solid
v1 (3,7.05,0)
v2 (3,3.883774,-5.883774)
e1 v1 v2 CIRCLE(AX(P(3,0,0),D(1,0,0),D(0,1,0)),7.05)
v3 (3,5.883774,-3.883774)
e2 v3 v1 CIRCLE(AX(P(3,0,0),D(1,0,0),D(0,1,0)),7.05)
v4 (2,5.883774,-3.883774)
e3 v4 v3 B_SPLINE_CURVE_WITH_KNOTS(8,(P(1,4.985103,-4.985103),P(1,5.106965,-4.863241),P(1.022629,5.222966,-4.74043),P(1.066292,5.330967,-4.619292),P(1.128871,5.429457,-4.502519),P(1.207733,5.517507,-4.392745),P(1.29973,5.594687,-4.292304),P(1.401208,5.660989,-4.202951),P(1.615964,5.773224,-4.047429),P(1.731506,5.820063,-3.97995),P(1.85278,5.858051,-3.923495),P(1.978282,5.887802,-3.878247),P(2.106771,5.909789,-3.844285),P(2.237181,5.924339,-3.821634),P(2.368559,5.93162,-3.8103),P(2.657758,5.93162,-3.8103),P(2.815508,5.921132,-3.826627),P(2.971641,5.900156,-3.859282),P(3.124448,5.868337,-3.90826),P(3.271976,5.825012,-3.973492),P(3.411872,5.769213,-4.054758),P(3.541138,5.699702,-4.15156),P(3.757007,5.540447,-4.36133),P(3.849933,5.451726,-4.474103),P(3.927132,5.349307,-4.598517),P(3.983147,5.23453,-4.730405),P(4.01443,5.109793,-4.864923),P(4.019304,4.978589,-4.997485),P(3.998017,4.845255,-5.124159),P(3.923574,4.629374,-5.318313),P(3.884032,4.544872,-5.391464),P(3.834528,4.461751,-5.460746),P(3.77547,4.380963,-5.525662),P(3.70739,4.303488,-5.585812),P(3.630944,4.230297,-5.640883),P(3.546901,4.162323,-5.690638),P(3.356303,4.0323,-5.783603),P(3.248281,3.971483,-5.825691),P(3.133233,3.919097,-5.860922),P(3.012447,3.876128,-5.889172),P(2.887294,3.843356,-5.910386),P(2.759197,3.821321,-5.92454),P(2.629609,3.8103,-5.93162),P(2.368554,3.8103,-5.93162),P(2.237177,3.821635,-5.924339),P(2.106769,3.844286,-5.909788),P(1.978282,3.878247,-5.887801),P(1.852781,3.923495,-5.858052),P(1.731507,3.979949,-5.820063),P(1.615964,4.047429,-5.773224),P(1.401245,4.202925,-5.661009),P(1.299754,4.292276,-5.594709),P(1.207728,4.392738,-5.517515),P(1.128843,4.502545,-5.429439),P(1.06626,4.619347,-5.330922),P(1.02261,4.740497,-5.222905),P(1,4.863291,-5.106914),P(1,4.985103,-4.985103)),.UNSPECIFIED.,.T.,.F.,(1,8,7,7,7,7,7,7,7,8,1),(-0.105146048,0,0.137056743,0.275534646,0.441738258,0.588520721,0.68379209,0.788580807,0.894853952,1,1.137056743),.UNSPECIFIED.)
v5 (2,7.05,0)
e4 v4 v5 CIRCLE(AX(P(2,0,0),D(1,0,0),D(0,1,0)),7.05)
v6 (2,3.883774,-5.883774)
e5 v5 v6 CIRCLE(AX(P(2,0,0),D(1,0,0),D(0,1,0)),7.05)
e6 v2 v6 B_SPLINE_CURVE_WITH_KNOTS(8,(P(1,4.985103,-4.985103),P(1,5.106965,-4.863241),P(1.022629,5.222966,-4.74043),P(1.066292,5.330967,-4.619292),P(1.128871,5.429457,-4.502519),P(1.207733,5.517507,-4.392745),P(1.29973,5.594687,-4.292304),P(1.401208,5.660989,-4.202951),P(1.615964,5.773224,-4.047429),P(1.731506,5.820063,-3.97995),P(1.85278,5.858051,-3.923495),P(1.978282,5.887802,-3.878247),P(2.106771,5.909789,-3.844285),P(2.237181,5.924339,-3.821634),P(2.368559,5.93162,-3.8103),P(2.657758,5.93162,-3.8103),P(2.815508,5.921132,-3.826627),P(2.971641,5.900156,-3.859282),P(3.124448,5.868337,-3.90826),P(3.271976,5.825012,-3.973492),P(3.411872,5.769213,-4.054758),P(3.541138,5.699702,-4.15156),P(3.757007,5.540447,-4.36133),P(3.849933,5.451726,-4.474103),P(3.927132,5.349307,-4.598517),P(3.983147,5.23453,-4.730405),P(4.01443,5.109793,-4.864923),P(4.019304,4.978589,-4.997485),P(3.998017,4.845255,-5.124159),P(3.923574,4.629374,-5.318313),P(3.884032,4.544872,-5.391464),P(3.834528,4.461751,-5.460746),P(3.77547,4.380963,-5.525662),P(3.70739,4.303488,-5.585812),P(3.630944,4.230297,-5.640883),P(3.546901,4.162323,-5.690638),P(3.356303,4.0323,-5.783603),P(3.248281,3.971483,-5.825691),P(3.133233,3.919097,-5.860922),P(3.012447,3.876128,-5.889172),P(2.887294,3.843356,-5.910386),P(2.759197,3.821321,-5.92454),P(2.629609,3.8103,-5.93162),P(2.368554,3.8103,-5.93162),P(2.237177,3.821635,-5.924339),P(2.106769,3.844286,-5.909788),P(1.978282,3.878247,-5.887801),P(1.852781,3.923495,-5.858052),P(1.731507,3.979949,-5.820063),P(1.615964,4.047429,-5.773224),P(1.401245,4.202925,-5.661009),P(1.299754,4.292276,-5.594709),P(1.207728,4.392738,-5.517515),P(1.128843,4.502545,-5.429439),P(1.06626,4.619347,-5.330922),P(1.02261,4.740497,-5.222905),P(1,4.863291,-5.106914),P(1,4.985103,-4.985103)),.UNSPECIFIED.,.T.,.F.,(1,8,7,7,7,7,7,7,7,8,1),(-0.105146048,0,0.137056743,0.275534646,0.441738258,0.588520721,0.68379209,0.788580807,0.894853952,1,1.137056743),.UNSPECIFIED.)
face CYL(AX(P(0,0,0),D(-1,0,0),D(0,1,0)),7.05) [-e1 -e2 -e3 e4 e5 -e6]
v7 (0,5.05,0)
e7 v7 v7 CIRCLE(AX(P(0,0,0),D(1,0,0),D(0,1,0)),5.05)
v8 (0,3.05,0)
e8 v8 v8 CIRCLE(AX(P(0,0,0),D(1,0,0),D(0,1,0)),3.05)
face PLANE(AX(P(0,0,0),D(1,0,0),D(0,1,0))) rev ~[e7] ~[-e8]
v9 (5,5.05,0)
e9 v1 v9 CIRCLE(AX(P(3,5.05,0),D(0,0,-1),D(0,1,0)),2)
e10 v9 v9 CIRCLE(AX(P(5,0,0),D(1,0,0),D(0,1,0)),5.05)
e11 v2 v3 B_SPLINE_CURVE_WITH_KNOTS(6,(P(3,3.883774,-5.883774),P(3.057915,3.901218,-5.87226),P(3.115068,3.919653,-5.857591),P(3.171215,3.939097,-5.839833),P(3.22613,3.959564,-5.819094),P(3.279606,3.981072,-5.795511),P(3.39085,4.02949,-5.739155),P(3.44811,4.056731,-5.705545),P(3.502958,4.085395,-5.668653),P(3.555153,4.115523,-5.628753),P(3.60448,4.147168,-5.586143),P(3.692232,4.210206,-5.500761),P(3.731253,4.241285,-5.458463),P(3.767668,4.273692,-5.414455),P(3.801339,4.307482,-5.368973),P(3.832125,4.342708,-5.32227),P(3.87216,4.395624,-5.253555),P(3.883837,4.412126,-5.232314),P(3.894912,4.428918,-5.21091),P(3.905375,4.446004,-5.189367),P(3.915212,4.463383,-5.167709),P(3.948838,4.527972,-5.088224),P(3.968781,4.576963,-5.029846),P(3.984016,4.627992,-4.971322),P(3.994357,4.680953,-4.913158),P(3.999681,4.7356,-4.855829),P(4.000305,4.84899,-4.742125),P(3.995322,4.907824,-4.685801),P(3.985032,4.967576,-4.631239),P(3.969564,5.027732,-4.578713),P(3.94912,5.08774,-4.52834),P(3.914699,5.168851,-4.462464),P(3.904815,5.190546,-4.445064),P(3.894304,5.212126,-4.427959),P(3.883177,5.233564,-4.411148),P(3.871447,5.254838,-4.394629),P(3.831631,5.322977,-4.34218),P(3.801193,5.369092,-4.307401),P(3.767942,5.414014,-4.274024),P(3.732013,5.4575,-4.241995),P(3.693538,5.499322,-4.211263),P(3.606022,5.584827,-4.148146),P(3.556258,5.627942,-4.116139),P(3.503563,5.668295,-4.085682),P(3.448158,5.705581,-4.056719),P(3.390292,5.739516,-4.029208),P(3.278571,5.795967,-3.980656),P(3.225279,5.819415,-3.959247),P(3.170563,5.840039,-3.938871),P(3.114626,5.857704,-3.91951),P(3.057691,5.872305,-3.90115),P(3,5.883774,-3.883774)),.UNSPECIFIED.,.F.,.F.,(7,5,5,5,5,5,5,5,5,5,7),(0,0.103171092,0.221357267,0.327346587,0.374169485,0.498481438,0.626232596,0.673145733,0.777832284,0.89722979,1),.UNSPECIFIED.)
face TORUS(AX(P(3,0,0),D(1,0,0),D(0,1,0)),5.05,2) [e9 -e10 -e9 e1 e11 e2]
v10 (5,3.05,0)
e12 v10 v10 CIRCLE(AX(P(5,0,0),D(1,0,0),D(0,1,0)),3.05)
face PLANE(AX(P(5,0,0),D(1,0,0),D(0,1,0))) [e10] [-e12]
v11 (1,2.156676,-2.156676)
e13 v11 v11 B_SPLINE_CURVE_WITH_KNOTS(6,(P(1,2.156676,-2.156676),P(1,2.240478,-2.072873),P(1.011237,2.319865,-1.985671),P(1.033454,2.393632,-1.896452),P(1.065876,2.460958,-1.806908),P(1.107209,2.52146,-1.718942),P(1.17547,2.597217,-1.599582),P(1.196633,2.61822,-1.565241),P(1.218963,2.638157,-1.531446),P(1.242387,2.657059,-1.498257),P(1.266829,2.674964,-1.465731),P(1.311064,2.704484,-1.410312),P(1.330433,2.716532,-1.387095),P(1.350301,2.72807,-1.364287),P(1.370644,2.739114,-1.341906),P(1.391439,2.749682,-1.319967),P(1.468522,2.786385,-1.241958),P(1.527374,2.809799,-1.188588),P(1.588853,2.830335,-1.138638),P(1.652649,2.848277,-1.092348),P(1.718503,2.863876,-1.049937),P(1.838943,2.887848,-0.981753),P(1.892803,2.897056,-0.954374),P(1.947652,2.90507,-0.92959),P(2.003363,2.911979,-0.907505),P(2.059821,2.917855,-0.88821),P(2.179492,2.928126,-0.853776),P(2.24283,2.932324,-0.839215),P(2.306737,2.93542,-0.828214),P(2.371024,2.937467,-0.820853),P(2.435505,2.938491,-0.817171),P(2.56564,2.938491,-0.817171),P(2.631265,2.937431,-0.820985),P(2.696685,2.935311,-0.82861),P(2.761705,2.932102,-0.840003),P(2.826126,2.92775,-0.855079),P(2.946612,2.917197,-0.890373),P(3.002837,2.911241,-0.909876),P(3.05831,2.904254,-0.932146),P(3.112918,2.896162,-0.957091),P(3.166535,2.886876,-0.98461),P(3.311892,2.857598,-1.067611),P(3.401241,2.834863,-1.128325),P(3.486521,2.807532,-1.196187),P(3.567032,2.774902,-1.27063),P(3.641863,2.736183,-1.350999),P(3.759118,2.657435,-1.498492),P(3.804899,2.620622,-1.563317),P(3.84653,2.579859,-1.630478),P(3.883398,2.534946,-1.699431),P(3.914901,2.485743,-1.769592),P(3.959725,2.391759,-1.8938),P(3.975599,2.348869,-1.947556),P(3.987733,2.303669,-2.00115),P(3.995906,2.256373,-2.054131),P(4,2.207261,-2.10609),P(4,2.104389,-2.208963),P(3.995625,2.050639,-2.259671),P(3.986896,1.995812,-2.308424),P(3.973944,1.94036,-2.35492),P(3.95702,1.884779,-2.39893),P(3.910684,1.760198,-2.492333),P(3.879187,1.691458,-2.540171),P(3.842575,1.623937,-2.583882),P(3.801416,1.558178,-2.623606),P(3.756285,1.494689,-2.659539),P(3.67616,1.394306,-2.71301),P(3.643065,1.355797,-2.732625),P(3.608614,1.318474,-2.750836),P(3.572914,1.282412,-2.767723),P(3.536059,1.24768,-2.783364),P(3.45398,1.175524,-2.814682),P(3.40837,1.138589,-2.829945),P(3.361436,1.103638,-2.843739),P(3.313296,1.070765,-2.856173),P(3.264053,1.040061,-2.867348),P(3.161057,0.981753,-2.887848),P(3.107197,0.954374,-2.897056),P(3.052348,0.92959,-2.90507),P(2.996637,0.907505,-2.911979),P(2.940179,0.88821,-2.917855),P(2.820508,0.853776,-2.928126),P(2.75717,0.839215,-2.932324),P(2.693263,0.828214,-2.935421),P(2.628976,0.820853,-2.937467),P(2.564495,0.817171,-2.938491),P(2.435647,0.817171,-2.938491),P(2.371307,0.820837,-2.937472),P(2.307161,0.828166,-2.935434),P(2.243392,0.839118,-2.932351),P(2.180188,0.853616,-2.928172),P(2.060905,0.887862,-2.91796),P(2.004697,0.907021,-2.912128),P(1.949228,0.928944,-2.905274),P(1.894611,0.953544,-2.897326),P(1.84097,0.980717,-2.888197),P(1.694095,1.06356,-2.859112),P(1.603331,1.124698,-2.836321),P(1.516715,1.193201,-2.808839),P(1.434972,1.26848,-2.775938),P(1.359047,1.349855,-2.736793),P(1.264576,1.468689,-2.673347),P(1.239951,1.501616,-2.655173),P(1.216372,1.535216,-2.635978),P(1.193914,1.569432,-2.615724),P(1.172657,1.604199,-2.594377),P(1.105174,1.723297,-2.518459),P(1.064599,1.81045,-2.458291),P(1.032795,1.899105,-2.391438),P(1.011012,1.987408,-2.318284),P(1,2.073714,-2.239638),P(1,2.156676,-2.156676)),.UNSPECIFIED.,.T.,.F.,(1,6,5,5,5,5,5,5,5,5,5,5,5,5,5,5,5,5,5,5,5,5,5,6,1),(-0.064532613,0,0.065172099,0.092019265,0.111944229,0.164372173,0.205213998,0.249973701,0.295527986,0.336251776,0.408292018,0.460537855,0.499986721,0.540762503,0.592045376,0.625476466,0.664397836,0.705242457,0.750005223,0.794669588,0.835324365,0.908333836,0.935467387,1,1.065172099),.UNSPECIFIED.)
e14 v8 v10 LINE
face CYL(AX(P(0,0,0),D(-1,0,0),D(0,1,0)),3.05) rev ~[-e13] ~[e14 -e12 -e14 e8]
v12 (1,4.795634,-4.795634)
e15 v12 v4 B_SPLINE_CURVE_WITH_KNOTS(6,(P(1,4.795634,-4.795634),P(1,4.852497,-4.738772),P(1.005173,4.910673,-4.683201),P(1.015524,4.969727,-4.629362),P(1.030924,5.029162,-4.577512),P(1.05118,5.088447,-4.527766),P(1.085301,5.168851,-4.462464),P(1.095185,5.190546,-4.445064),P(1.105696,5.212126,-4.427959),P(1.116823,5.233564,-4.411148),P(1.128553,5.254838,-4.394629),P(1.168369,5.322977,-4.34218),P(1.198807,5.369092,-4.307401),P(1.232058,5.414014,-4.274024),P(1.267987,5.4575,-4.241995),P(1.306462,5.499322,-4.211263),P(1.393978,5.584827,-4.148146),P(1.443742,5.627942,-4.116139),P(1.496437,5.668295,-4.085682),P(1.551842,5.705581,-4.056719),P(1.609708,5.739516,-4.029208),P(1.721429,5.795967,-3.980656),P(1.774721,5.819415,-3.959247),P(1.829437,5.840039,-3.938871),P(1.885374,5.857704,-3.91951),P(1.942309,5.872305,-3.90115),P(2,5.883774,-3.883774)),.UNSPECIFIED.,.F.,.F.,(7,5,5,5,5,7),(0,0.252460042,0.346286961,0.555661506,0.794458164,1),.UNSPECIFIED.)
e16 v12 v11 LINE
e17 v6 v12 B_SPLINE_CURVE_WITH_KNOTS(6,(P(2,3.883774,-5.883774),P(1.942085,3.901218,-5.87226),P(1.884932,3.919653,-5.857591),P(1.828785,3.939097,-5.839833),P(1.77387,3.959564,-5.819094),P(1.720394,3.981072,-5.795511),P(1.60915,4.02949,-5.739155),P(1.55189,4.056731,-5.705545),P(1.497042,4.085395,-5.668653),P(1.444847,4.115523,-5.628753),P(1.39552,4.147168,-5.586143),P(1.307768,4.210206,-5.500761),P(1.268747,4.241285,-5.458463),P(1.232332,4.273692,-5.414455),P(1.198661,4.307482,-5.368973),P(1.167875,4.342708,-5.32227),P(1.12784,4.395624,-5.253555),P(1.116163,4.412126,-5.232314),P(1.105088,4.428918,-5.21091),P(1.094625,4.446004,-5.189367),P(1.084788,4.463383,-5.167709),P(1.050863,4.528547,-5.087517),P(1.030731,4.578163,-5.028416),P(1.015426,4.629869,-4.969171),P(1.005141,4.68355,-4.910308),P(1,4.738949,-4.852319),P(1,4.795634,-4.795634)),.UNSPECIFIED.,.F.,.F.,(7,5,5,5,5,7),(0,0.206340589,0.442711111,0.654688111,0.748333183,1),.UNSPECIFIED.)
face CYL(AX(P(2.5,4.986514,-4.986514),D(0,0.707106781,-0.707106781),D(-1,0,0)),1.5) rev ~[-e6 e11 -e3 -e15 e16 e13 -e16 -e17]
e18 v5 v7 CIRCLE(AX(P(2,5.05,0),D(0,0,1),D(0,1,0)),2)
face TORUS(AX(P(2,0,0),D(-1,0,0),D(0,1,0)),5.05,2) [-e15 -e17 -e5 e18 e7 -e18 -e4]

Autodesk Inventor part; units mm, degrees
ref_plane "YZ Plane" through (0, 0, 0) normal (1, 0, 0) x (0, 1, 0)
ref_plane "XZ Plane" through (0, 0, 0) normal (0, 1, 0) x (-1, 0, 0)
sketch "Sketch1" plane through (0, 0, 0) normal (1, 0, 0) x (0, 1, 0)
  circle A0 centre (0, 0) radius 3.05
  circle A1 centre (0, 0) radius 7.05
  dimension "d0" = 6.1
  dimension "d1" = 4
extrude "Extrusion1" add sketch "Sketch1" along normal blind 5
sketch "Sketch2" plane through (5, 0, 0) normal (1, 0, 0) x (0, 0, -1)
  line L0 (0, 0) -> (4.9851, 4.9851)
  circle A0 centre (0, 0) radius 7.05 projected
  line L1 (0, 0) -> (7.05, 0) construction
  dimension "d4" = 45
ref_plane "Work Plane1" through (5, 4.9851, -4.9851) normal (0, 0.7071068, -0.7071068) x (-1, 0, 0)
sketch "Sketch3" plane through (5, 4.9851, -4.9851) normal (0, 0.7071068, -0.7071068) x (-1, 0, 0)
  line L0 (5, 0) -> (0, 0)
  line L1 (0, 7.05) -> (0, -7.05) projected
  line L2 (5, 0) -> (10, 0) construction
  circle A0 centre (2.5, 0) radius 1.5
  dimension "d5" = 5
  dimension "d6" = 180
  dimension "d7" = 3
extrude "Extrusion2" cut sketch "Sketch3" against normal blind 5
thread "Thread1" size "M3x0.5" class "6H" standard "ANSI Metric M Profile" full length
fillet "Fillet1" radius 2 2 edges at (5, -7.05, 0) (0, -7.05, 0)
properties part number "6mm rod topper"
